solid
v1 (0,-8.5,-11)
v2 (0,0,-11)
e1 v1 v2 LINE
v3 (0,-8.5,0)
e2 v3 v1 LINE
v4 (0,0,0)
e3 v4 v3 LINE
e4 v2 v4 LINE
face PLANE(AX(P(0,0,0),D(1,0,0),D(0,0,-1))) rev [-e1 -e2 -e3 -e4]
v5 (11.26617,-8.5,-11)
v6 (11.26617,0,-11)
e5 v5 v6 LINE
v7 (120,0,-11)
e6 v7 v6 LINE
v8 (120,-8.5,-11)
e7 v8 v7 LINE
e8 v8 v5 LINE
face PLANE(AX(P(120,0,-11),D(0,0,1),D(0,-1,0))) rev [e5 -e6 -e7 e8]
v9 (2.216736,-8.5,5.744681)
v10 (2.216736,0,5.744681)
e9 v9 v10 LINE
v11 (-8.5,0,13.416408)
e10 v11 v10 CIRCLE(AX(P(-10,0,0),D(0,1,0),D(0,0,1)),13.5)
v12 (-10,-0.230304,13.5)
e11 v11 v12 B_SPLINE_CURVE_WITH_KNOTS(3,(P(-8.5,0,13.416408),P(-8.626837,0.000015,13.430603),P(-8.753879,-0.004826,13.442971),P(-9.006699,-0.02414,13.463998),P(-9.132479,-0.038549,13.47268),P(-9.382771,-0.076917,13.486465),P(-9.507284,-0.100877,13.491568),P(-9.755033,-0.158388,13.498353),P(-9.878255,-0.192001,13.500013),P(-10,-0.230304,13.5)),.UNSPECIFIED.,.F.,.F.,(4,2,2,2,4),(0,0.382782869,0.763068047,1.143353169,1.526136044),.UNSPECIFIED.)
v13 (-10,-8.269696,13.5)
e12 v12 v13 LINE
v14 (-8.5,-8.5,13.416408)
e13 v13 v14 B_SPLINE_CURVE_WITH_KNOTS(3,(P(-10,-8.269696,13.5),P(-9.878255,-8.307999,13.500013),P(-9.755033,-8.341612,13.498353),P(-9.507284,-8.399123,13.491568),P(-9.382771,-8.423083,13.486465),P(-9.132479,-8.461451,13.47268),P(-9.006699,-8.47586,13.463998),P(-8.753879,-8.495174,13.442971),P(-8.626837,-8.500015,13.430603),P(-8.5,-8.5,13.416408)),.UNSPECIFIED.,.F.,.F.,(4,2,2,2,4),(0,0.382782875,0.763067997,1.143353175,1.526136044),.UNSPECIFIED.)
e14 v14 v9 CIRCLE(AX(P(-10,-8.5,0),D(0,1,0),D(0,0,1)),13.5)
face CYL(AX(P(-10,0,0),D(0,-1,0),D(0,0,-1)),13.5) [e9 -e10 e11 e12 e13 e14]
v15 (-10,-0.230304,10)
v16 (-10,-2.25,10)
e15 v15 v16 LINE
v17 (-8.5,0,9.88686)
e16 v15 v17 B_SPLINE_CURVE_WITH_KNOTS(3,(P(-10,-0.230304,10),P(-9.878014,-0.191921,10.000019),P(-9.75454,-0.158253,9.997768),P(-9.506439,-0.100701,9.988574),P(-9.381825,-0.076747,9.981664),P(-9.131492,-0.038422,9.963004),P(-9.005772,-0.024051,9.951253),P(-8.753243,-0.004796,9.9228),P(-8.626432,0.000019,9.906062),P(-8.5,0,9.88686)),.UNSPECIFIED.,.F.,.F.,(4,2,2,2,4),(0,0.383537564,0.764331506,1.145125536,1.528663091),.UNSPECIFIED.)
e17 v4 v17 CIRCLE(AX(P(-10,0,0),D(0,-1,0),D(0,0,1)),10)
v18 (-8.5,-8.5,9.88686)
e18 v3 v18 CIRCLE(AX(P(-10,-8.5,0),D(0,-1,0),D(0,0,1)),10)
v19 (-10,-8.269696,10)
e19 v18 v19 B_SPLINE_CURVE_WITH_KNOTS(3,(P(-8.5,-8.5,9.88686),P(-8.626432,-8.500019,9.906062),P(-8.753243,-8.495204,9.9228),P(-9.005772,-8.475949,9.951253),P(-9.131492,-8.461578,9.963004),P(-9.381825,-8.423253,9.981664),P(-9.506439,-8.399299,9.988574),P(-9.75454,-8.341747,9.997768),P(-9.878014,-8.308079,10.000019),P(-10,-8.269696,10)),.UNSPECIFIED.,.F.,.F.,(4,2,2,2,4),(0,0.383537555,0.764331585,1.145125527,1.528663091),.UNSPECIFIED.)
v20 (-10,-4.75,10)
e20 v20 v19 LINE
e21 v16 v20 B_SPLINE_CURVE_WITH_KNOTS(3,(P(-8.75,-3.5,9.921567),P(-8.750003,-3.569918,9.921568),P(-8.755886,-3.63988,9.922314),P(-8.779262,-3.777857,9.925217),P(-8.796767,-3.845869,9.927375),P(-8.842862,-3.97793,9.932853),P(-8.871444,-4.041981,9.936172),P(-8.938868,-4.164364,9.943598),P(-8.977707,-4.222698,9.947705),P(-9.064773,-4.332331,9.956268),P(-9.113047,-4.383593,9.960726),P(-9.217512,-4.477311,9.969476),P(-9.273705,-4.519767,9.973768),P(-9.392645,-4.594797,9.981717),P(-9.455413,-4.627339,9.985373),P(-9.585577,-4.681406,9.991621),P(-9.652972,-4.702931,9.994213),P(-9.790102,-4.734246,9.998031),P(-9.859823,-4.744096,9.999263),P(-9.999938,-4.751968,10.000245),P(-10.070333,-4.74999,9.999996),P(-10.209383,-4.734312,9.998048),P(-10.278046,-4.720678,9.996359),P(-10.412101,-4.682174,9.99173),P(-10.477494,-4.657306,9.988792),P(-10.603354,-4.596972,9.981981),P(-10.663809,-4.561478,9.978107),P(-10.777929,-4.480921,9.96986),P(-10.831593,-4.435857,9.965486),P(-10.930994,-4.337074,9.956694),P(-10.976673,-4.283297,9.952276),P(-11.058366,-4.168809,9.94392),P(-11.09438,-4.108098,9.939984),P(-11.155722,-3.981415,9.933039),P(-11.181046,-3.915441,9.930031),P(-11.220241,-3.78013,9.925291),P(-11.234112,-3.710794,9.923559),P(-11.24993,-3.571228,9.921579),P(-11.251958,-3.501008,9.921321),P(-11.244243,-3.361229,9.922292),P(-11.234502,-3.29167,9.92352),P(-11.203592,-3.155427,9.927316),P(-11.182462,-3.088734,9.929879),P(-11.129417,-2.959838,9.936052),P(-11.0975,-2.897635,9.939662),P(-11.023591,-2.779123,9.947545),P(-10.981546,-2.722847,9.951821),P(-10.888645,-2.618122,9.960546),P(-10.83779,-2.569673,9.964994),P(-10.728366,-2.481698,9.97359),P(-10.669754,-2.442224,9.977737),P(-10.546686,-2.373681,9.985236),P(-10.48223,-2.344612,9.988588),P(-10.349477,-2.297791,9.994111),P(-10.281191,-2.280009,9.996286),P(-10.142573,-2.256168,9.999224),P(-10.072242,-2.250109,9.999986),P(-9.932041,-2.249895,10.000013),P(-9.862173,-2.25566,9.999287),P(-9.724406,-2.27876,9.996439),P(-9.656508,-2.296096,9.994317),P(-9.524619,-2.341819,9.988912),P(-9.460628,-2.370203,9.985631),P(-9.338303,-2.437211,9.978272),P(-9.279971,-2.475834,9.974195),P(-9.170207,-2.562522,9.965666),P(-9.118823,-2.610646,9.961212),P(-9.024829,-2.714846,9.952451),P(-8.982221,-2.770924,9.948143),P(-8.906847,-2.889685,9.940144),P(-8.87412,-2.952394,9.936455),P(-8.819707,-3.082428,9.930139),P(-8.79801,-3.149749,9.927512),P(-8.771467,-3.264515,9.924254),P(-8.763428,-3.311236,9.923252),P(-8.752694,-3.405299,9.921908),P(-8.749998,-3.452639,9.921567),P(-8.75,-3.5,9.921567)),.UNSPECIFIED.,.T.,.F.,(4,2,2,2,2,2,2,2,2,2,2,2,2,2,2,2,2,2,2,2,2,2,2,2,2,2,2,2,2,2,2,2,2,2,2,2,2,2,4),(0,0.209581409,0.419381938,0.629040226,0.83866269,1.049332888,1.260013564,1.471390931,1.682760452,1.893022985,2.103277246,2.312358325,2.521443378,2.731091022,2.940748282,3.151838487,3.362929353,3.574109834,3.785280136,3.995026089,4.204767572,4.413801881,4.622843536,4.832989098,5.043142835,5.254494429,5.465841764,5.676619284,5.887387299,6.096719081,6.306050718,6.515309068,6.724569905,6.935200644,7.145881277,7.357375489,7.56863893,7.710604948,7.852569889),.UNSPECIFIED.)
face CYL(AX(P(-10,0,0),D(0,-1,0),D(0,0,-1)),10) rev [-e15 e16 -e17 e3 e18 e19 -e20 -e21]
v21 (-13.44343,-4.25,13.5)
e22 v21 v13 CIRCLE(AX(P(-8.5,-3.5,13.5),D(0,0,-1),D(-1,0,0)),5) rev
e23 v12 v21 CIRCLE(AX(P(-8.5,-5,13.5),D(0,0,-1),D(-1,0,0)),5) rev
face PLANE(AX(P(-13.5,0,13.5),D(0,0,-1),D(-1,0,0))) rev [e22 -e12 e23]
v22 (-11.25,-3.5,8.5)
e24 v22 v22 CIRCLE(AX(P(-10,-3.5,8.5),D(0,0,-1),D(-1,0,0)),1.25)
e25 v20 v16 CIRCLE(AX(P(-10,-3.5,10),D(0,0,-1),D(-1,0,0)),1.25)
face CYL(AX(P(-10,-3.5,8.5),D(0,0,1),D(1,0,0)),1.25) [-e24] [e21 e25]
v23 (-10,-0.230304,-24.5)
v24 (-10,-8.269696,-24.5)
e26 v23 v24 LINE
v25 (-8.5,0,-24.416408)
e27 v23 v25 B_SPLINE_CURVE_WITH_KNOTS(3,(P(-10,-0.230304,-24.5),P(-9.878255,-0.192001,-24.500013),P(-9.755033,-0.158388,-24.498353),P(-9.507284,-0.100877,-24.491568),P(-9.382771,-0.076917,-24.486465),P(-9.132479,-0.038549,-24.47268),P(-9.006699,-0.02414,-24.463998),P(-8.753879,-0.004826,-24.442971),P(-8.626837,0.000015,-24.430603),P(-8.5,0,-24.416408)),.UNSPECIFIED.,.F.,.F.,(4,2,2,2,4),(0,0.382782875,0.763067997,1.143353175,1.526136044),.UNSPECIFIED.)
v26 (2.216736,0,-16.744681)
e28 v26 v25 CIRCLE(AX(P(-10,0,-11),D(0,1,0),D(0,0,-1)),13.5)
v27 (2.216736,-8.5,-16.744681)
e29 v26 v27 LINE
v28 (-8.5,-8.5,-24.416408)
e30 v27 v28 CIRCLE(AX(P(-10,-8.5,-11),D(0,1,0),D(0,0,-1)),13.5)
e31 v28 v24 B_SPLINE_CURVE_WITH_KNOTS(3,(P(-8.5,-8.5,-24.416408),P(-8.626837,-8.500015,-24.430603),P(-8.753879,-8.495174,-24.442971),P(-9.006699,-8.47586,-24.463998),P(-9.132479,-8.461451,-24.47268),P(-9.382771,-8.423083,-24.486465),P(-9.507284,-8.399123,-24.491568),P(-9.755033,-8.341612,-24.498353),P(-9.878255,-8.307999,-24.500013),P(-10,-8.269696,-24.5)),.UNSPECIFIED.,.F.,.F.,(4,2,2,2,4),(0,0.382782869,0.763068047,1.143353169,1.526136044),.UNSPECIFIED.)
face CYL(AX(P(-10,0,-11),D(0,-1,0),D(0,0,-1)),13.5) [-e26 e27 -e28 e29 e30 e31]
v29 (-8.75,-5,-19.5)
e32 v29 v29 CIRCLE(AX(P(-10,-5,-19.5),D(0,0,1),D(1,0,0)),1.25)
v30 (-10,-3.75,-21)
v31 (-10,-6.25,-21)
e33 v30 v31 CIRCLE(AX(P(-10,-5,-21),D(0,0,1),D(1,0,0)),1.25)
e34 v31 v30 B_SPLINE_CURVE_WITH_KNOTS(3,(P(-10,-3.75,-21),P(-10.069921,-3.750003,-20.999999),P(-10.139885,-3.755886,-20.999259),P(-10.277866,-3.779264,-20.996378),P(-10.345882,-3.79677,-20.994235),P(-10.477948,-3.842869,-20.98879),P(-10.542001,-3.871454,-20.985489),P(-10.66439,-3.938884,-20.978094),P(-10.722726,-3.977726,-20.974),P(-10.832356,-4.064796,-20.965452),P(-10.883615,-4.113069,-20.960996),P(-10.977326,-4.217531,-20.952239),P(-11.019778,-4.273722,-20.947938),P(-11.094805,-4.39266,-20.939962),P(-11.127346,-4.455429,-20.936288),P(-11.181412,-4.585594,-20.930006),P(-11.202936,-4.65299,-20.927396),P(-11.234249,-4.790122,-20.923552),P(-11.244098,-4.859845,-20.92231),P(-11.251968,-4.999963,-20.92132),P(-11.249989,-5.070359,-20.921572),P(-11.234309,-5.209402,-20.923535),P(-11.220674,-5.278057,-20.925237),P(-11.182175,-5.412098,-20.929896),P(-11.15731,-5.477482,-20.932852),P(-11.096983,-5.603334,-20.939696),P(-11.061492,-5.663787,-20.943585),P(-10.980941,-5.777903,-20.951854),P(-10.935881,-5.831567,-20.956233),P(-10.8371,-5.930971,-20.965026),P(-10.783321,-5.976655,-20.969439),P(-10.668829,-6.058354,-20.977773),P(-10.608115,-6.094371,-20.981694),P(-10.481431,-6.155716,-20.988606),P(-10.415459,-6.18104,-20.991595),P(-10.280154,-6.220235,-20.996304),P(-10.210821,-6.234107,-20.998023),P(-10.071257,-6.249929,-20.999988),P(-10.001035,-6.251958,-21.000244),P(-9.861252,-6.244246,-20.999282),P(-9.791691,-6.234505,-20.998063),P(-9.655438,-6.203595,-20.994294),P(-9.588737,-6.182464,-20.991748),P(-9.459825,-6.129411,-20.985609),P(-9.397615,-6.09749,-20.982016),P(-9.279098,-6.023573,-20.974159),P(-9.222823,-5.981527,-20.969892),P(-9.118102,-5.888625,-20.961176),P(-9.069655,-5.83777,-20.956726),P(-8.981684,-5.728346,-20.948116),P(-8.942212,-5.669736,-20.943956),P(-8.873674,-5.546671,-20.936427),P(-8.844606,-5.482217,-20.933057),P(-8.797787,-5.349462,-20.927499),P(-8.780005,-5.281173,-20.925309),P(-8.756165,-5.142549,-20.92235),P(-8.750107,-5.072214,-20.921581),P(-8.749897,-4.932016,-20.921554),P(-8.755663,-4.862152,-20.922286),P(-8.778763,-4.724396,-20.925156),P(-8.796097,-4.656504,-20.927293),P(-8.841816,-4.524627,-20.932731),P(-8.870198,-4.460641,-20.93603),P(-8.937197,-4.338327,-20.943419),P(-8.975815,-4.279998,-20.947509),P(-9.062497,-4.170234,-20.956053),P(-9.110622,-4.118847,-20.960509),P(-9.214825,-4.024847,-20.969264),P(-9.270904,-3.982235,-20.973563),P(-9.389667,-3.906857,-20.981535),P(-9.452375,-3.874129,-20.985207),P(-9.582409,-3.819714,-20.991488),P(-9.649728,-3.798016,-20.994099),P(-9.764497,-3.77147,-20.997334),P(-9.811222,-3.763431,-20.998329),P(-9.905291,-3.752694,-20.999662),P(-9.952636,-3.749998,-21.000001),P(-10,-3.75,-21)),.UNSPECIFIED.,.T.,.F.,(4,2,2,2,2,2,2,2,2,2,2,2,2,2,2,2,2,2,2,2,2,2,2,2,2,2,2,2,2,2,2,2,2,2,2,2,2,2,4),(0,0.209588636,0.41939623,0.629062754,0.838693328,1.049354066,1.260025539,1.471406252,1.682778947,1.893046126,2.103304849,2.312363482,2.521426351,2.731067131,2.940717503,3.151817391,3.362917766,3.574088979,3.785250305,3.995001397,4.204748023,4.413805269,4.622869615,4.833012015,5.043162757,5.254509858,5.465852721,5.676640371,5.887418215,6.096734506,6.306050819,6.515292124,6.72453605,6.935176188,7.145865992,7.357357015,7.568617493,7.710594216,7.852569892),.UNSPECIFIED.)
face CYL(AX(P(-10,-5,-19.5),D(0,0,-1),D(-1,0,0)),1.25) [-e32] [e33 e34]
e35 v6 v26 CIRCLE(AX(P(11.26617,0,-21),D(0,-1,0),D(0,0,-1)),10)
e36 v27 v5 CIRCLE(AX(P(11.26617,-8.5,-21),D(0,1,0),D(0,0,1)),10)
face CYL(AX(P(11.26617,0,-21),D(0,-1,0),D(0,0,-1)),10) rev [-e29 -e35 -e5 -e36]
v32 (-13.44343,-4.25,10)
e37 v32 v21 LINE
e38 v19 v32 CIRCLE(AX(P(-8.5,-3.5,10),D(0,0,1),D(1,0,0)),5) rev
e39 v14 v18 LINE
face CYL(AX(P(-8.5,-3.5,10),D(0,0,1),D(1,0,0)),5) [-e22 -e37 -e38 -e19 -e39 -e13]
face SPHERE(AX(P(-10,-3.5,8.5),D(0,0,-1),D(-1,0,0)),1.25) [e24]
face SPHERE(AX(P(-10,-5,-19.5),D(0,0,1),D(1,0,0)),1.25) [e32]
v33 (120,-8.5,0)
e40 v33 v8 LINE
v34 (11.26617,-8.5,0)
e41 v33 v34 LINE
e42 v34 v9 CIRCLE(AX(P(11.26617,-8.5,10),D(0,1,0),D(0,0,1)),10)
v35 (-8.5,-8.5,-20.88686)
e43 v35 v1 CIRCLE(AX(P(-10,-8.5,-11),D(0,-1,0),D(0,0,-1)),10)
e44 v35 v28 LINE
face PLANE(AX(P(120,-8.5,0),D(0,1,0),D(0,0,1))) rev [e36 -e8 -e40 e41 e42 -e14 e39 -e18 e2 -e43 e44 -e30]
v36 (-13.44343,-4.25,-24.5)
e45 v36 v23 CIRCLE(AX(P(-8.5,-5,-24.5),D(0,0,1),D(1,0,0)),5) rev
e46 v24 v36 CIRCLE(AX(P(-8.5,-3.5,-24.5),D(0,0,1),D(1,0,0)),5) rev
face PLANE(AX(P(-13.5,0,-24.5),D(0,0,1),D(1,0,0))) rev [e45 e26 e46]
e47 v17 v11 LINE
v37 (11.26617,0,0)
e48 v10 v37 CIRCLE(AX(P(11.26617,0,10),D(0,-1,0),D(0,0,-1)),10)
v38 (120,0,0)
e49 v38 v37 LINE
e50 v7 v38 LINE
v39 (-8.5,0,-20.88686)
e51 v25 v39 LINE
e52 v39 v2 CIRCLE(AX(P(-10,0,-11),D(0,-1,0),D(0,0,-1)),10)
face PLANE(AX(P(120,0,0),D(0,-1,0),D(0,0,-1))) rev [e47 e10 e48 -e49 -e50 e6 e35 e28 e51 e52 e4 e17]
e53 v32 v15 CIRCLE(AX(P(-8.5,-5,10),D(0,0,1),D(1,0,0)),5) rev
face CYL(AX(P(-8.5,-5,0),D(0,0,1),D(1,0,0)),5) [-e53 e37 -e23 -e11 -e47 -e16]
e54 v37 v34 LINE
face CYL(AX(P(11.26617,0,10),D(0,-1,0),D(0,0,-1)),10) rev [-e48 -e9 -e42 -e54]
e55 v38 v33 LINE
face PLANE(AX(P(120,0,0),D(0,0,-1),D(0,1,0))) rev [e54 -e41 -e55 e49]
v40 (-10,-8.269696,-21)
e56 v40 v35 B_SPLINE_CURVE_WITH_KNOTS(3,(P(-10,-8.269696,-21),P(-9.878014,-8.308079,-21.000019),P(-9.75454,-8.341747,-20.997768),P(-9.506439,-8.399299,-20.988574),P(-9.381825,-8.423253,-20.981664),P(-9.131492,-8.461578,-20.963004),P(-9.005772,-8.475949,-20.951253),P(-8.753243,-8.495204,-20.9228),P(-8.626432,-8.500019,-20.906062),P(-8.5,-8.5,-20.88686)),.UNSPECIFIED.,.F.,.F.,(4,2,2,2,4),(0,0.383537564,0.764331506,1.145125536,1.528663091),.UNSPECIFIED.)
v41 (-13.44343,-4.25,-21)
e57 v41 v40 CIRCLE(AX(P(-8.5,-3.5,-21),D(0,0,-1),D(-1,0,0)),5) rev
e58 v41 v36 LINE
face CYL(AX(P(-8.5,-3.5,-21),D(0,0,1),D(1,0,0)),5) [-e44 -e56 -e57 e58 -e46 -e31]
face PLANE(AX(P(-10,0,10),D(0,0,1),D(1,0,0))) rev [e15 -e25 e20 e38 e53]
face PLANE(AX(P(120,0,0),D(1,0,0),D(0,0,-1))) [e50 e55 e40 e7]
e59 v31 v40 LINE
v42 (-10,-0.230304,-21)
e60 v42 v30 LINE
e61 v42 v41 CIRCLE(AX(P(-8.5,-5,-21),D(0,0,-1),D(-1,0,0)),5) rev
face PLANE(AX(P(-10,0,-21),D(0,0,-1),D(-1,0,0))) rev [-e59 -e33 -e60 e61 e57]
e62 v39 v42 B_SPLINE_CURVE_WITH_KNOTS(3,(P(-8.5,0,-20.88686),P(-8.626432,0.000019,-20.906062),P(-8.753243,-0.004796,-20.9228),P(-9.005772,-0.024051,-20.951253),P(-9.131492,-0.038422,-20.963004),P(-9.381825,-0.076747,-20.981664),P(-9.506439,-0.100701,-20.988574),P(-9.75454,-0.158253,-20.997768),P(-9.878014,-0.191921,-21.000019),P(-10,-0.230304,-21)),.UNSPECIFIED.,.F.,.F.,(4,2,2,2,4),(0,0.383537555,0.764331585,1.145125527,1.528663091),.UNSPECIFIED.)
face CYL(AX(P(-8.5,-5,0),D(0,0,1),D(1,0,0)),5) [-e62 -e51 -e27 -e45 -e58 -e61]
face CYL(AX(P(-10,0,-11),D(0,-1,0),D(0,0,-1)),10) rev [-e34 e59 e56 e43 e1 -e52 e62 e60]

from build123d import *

# Parameters (mm, degrees)
SKETCH1_W           = 11
SKETCH1_H           = 8.5
BOSS_EXTRUDE1_DEPTH = 120
BOSS_EXTRUDE3_START = -8.5
BOSS_EXTRUDE3_DEPTH = 8.5
FILLET5_R           = 10
FILLET6_R           = 5
SKETCH18_R          = 1.25
BOSS_EXTRUDE4_DEPTH = 1.5
SKETCH19_R          = 1.25
BOSS_EXTRUDE5_DEPTH = 1.5
REVOLVE9_ANGLE      = 180
REVOLVE10_ANGLE     = 180


with BuildPart() as part:
    # Sketch1 → Boss-Extrude1 (new body)
    with BuildSketch(Plane(origin=(0, 0, 0), x_dir=(0, 0, -1), z_dir=(1, 0, 0))):
        with Locations((5.5, -4.25)):
            Rectangle(SKETCH1_W, SKETCH1_H)
    extrude(amount=BOSS_EXTRUDE1_DEPTH)

    # Sketch17 → Boss-Extrude3 (add)
    with BuildSketch(Plane(origin=(0, 0, 0), x_dir=(1, 0, 0), z_dir=(0, 1, 0)).offset(BOSS_EXTRUDE3_START)):
        with BuildLine():
            Line((-10, -10), (-13.5, -10))
            Line((-13.5, -10), (-13.5, -13.5))
            Line((-13.5, -13.5), (-10, -13.5))
            ThreePointArc((-10, -13.5), (-0.454058454, -9.545941546), (3.5, 0))
            Line((3.5, 0), (3.5, 11))
            ThreePointArc((3.5, 11), (-0.454058454, 20.545941546), (-10, 24.5))
            Line((-10, 24.5), (-13.5, 24.5))
            Line((-13.5, 24.5), (-13.5, 21))
            Line((-13.5, 21), (-10, 21))
            ThreePointArc((-10, 21), (-2.928932188, 18.071067812), (0, 11))
            Line((0, 11), (0, 0))
            ThreePointArc((0, 0), (-2.928932188, -7.071067812), (-10, -10))
        make_face()
    extrude(amount=BOSS_EXTRUDE3_DEPTH)

    # Fillet5
    fillet5_edges = [part.edges().sort_by_distance(p)[0] for p in [
        (3.5, -4.25, 0),
        (3.5, -4.25, -11),
    ]]
    fillet(fillet5_edges, radius=FILLET5_R)

    # Fillet6
    # the kernel refuses this fillet: 5 mm, written as the material it takes off along each edge
    with BuildSketch(Plane(origin=(-13.5, -8.5, -2.5), x_dir=(0, 1, 0), z_dir=(0, 0, 1)), Plane(origin=(-13.5, 0, -2.5), x_dir=(1, 0, 0), z_dir=(0, 0, 1)), Plane(origin=(-13.5, -8.5, -37), x_dir=(0, 1, 0), z_dir=(0, 0, 1)), Plane(origin=(-13.5, 0, -37), x_dir=(1, 0, 0), z_dir=(0, 0, 1))) as fillet6_piece_1:
        with BuildLine():
            CenterArc((FILLET6_R, -FILLET6_R), FILLET6_R, 90, 90)
            Line((0, -FILLET6_R), (0, 0))
            Line((0, 0), (FILLET6_R, 0))
        make_face()
    extrude(amount=28.5, mode=Mode.SUBTRACT)

    # Sketch18 → Boss-Extrude4 (add)
    with BuildSketch(Plane.XY.offset(-21)):
        with Locations(Location((-10, -5, 0), (0, 0, 270))):
            Circle(SKETCH18_R)
    extrude(amount=BOSS_EXTRUDE4_DEPTH)

    # Sketch19 → Boss-Extrude5 (add)
    with BuildSketch(Plane(origin=(0, 0, 10), x_dir=(-1, 0, 0), z_dir=(0, 0, -1))):
        with Locations(Location((10, -3.5, 0), (0, 0, 269.999999996))):
            Circle(SKETCH19_R)
    extrude(amount=BOSS_EXTRUDE5_DEPTH)

    # Sketch24 → Revolve9 (revolve)
    with BuildSketch(Plane(origin=(0, 0, 8.5), x_dir=(-1, 0, 0), z_dir=(0, 0, -1))):
        with BuildLine():
            Line((10, -2.25), (10, -4.75))
            ThreePointArc((10, -4.75), (11.25, -3.5), (10, -2.25))
        make_face()
    revolve(axis=Axis((-10, -2.25, 8.5), (0, -1, 0)), revolution_arc=REVOLVE9_ANGLE)

    # Sketch25 → Revolve10 (revolve)
    with BuildSketch(Plane.XY.offset(-19.5)):
        with BuildLine():
            Line((-10, -3.75), (-10, -6.25))
            ThreePointArc((-10, -6.25), (-11.25, -5), (-10, -3.75))
        make_face()
    revolve(axis=Axis((-10, -3.75, -19.5), (0, 1, 0)), revolution_arc=REVOLVE10_ANGLE)


solid = part.part
